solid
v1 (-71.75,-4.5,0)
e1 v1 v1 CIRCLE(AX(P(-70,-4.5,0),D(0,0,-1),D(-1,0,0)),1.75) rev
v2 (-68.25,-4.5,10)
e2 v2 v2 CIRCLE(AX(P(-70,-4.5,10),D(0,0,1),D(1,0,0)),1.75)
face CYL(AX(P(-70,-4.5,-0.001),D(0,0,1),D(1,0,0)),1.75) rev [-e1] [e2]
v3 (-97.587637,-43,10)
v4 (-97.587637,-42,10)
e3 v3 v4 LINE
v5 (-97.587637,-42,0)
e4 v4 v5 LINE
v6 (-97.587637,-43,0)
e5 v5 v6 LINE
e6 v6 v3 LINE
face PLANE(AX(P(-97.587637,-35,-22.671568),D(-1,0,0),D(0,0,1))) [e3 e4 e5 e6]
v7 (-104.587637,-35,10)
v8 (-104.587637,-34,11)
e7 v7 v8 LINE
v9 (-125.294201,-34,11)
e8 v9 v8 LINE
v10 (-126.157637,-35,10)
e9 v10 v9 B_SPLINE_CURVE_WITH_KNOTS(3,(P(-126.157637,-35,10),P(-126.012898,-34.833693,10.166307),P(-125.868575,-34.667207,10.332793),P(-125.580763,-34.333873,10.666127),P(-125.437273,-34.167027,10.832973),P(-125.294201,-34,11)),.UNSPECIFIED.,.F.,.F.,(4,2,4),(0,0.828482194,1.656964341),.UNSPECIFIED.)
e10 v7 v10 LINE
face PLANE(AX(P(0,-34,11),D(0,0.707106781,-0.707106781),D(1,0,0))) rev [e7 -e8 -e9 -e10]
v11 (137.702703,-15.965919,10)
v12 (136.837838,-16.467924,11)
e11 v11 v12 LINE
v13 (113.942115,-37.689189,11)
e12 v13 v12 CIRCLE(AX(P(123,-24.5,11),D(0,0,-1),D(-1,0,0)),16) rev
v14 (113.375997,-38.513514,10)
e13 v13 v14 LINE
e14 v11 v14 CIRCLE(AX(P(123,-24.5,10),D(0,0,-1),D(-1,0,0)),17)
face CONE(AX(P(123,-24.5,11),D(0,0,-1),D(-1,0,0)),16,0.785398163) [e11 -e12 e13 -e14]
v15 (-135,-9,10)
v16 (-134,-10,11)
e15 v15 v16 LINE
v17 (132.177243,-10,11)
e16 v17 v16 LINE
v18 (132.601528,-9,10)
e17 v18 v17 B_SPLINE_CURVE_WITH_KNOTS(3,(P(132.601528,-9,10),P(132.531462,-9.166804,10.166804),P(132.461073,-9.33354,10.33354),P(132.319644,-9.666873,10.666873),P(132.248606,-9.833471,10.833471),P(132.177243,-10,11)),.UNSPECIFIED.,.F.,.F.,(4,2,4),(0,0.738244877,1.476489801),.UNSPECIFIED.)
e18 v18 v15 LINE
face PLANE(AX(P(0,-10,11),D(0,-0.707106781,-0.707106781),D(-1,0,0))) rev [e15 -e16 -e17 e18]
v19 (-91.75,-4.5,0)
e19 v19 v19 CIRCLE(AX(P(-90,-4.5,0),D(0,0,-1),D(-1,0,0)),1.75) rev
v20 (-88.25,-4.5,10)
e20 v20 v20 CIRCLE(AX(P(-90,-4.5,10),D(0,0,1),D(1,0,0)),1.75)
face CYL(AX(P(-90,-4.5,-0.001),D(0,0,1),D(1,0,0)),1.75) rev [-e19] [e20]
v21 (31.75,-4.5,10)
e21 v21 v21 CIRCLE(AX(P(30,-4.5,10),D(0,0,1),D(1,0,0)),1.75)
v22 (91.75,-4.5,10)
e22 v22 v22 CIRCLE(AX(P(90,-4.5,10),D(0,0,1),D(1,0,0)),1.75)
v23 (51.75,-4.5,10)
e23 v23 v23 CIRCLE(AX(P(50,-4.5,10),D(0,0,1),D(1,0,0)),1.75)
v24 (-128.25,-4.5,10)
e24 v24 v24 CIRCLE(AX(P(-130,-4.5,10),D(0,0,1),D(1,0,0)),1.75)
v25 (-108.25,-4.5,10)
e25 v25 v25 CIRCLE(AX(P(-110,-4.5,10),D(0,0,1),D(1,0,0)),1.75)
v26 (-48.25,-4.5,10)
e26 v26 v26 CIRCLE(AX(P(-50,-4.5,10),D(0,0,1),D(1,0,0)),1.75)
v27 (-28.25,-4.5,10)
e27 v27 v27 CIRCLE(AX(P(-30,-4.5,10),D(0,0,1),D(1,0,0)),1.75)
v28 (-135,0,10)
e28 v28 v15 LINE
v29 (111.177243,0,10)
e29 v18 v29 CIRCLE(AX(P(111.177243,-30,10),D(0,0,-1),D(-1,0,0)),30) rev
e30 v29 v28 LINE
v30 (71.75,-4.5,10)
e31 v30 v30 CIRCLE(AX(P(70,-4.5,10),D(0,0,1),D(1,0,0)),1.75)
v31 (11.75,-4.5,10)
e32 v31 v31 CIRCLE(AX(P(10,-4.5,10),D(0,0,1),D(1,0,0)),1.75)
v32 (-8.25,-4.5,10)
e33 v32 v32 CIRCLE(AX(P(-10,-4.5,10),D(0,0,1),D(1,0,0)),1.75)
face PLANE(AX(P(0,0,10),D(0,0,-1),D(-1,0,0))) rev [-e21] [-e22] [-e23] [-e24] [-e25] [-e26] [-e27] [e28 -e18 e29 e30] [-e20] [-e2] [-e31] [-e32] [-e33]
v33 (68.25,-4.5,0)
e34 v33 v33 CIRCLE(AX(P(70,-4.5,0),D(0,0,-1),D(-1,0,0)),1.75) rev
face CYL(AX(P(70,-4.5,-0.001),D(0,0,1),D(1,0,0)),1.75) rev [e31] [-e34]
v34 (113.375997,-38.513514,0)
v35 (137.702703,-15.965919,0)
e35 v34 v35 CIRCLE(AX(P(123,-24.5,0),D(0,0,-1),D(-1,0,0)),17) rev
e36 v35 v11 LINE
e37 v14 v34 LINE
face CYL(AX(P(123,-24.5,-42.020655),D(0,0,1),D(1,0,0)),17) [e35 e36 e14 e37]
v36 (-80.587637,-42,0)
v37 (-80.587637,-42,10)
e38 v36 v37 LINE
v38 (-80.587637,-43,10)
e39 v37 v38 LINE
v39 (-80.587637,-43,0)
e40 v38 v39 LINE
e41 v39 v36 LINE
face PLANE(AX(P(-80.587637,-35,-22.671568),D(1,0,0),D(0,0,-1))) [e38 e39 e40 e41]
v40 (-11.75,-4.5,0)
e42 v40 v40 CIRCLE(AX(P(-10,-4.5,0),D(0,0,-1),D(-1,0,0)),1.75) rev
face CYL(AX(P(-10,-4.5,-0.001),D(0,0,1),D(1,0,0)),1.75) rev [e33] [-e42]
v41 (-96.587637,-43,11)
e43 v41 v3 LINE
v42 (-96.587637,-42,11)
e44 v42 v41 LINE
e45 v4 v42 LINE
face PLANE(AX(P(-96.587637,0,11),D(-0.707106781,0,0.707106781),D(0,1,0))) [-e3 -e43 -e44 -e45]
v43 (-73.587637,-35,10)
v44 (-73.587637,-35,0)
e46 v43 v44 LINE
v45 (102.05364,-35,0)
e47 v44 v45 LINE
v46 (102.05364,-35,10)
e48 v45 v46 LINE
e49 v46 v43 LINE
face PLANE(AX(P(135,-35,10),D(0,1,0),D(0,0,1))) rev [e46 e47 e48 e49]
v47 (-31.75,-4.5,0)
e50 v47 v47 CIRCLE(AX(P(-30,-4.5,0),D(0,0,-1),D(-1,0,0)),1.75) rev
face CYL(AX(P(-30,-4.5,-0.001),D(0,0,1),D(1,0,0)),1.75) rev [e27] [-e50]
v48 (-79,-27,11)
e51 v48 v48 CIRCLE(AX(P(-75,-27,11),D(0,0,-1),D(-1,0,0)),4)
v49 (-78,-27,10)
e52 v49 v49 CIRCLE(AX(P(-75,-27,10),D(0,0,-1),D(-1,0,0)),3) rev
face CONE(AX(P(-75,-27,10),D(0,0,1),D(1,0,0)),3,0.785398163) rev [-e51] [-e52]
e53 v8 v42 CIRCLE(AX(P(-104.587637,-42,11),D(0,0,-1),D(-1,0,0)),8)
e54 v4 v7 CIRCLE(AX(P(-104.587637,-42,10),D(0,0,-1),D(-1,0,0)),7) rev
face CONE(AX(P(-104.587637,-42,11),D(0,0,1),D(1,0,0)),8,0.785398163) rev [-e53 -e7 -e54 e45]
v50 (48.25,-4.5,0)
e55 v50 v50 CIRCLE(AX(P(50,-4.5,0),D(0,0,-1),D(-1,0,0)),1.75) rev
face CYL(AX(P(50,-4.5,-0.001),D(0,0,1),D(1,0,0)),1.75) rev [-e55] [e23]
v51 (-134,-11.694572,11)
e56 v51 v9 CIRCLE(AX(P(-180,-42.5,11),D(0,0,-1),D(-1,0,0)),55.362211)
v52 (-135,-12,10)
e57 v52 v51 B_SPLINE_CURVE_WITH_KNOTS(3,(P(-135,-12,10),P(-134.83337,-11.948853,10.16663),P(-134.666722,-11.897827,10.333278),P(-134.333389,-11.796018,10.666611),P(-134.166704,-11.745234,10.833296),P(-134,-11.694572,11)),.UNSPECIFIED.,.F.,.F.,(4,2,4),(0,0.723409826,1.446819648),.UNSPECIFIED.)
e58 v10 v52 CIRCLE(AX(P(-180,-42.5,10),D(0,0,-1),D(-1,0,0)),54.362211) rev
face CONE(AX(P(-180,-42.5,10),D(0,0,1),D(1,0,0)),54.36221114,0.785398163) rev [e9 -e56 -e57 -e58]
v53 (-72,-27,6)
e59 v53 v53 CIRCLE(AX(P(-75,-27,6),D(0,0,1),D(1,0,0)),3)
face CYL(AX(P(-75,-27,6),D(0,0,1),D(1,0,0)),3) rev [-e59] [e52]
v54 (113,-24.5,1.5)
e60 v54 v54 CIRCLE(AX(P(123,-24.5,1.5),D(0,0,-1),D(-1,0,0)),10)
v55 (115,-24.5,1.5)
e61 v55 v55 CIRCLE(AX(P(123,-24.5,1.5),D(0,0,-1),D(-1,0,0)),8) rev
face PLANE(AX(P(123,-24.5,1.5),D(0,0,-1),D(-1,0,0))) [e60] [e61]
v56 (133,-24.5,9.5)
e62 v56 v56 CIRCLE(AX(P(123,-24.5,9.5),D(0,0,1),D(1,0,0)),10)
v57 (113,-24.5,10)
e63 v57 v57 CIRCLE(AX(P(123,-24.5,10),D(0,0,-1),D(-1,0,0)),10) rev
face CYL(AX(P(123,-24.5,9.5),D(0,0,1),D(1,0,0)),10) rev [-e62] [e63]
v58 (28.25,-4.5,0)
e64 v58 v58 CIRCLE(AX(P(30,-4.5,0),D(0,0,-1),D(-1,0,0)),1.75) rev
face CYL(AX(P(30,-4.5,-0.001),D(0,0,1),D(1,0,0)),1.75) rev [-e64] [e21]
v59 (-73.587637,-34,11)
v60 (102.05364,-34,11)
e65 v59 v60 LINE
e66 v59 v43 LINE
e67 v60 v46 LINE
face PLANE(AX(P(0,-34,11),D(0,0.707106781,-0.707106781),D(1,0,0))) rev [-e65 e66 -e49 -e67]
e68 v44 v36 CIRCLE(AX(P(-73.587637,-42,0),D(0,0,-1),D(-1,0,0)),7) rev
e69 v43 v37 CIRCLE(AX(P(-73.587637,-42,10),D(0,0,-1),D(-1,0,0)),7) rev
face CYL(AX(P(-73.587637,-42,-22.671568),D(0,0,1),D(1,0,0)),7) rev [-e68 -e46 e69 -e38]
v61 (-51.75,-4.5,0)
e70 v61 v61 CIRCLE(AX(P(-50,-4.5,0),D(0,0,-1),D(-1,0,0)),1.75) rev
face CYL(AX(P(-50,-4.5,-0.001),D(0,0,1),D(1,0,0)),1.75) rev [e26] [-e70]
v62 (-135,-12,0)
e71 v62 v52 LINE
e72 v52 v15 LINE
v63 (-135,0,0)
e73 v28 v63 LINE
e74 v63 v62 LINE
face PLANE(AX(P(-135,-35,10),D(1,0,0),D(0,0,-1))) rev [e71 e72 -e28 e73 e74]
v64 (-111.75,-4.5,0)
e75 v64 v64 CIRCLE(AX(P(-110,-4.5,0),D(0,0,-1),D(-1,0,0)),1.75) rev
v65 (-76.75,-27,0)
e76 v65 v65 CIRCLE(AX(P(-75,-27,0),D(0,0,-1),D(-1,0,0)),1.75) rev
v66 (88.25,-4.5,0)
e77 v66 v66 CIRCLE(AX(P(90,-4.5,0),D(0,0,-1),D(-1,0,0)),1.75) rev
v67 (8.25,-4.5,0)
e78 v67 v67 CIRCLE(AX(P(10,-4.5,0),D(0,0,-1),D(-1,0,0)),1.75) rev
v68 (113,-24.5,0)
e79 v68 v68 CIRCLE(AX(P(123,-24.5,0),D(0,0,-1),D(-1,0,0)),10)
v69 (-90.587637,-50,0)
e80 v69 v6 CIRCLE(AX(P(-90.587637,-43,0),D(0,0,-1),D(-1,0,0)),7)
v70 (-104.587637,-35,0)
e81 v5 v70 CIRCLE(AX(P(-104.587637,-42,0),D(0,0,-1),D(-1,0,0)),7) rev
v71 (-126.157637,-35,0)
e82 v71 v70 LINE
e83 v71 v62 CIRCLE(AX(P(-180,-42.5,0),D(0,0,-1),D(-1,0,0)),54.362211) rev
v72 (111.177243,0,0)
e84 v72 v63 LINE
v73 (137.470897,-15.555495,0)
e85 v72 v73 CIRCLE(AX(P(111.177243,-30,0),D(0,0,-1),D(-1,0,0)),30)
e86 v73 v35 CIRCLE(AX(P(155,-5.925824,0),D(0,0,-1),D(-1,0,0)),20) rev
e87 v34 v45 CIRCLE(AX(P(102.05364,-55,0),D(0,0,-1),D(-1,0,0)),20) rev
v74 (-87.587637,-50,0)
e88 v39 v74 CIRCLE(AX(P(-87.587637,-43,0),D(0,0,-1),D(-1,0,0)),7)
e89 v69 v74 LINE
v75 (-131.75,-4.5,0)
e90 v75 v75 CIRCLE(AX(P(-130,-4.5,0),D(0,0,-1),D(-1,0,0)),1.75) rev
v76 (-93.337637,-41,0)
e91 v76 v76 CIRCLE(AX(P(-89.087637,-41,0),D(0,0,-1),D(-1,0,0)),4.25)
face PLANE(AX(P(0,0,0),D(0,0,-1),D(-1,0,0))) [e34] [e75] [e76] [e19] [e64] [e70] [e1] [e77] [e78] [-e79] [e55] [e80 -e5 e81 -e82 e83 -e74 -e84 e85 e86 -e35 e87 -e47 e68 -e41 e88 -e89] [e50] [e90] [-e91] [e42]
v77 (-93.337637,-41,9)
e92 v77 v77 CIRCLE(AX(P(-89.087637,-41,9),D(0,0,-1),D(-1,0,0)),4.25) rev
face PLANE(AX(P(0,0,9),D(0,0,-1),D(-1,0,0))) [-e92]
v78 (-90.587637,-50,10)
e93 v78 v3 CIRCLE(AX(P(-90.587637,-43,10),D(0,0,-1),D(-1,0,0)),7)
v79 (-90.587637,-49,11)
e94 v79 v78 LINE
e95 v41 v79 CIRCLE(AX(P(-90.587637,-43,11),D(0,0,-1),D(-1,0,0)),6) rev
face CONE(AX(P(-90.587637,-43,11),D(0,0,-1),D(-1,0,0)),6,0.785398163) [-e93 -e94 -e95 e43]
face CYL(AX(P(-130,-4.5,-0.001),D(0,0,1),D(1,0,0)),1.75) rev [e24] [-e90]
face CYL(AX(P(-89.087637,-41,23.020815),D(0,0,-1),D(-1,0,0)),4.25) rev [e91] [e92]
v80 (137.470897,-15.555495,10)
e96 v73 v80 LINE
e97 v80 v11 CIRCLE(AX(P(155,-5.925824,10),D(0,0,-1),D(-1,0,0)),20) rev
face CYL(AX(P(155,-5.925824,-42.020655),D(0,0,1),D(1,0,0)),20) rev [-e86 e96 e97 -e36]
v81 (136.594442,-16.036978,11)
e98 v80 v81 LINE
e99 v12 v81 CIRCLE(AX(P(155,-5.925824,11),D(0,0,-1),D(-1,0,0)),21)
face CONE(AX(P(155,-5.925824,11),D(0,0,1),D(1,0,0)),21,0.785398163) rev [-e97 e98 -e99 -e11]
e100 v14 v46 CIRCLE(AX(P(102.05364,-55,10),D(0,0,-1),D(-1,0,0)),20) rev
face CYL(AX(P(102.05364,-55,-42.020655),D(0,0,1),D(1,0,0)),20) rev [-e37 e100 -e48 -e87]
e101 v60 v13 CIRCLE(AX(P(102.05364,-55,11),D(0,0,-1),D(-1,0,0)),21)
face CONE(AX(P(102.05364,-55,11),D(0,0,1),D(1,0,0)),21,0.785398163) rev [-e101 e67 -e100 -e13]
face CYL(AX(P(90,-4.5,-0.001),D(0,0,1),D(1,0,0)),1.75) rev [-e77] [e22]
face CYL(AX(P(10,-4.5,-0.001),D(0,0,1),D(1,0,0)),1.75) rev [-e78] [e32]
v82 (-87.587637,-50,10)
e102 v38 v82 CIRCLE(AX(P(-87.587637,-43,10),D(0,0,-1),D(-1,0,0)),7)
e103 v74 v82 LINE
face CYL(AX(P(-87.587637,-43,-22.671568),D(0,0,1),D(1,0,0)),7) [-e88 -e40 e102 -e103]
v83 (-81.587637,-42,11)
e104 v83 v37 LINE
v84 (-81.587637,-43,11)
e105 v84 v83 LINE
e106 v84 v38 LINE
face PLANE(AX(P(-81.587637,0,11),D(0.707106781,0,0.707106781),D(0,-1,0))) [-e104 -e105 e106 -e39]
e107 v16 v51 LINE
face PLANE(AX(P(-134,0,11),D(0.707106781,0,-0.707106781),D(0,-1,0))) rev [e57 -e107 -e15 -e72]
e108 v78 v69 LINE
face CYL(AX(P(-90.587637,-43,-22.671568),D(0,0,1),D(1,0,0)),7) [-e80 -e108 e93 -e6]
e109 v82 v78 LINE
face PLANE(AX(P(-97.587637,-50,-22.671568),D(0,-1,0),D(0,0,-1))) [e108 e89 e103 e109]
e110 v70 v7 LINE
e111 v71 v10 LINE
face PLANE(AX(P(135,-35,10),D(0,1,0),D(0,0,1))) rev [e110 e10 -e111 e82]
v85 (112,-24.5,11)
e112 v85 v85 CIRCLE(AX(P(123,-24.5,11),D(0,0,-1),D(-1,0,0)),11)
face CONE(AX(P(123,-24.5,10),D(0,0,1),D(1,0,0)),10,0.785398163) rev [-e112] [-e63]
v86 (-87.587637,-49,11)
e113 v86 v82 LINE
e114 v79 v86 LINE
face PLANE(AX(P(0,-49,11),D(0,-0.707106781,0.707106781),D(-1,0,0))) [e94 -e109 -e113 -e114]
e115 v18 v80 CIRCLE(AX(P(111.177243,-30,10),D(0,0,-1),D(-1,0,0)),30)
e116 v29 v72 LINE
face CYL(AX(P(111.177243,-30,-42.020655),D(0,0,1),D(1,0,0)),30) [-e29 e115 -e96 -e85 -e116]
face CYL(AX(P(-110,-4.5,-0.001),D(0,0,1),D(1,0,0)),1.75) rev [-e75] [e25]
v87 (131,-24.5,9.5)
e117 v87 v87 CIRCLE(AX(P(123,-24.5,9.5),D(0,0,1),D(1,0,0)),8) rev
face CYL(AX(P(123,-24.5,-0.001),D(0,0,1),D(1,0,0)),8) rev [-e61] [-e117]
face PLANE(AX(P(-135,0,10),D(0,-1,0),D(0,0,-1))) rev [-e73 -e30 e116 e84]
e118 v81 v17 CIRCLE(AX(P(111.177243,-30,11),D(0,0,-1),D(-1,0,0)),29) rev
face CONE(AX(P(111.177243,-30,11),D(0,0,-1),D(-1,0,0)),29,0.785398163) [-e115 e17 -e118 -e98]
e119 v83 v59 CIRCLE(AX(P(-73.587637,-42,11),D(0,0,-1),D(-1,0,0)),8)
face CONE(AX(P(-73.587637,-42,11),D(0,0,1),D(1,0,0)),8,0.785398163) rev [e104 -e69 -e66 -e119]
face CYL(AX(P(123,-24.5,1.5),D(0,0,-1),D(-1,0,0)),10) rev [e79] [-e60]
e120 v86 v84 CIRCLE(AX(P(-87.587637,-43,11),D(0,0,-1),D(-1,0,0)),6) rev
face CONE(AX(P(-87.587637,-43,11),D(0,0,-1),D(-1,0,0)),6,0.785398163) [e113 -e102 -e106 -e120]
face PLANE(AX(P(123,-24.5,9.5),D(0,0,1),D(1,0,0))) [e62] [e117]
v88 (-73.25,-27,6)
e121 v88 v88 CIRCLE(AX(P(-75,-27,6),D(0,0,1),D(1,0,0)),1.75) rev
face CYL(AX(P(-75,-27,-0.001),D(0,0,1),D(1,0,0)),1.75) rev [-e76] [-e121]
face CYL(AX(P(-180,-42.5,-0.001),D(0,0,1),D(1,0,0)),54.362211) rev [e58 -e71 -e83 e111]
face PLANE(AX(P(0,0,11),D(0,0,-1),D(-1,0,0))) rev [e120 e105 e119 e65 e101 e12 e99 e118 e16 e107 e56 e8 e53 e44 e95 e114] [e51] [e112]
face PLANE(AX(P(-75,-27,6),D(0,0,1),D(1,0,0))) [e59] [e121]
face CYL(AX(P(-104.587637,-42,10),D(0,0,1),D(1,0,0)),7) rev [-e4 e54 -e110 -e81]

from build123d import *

# Parameters (mm, degrees)
SKETCH1_W           = 270
SKETCH1_H           = 35
BOSS_EXTRUDE1_DEPTH = 10
SKETCH2_W           = 270
SKETCH2_H           = 26
BOSS_EXTRUDE2_DEPTH = 1
CUT_EXTRUDE1_REACH  = 141.821
SKETCH3_R           = 1.75
CUT_EXTRUDE3_REACH  = 141.896
SKETCH4_R           = 8
SKETCH5_R           = 10
CUT_EXTRUDE4_DEPTH  = 1.5
CUT_EXTRUDE5_START  = -1.5
SKETCH6_R           = 10
CUT_EXTRUDE5_DEPTH  = 1.5
CUT_EXTRUDE14_REACH = 141.896
SKETCH20_W          = 17
SKETCH20_H          = 15
BOSS_EXTRUDE5_DEPTH = 11
SKETCH21_R          = 4.25
CUT_EXTRUDE15_DEPTH = 9
FILLET1_R           = 7
CUT_EXTRUDE16_REACH = 146.381
SKETCH22_R          = 1.75
SKETCH24_R          = 3
CUT_EXTRUDE17_DEPTH = 5
BOSS_EXTRUDE6_DEPTH = 11
FILLET2_R           = 20
FILLET3_R           = 30
CHAMFER1_SIZE       = 1


# Some blends are built 0.0001 mm under size
with BuildPart() as part:
    # Sketch1 → Boss-Extrude1 (new body)
    with BuildSketch(Plane.XY):
        with Locations((0, -17.5)):
            Rectangle(SKETCH1_W, SKETCH1_H)
    extrude(amount=BOSS_EXTRUDE1_DEPTH)

    # Sketch2 → Boss-Extrude2 (add)
    with BuildSketch(Plane.XY.offset(10)):
        with Locations((0, -22)):
            Rectangle(SKETCH2_W, SKETCH2_H)
    extrude(amount=BOSS_EXTRUDE2_DEPTH)

    # Sketch3 → Cut-Extrude1 (cut, up to next)
    with BuildSketch(Plane.XY.offset(10), mode=Mode.PRIVATE) as cut_extrude1_sk1:
        with Locations((-130, -4.5)):
            Circle(SKETCH3_R)
    cut_extrude1_tool1 = extrude(cut_extrude1_sk1.sketch, amount=-CUT_EXTRUDE1_REACH, mode=Mode.PRIVATE) & part.part
    # Sketch3 → Cut-Extrude1 (cut, up to next)
    with BuildSketch(Plane.XY.offset(10), mode=Mode.PRIVATE) as cut_extrude1_sk2:
        with Locations((-110, -4.5)):
            Circle(SKETCH3_R)
    cut_extrude1_tool2 = extrude(cut_extrude1_sk2.sketch, amount=-CUT_EXTRUDE1_REACH, mode=Mode.PRIVATE) & part.part
    # Sketch3 → Cut-Extrude1 (cut, up to next)
    with BuildSketch(Plane.XY.offset(10), mode=Mode.PRIVATE) as cut_extrude1_sk3:
        with Locations((-90, -4.5)):
            Circle(SKETCH3_R)
    cut_extrude1_tool3 = extrude(cut_extrude1_sk3.sketch, amount=-CUT_EXTRUDE1_REACH, mode=Mode.PRIVATE) & part.part
    # Sketch3 → Cut-Extrude1 (cut, up to next)
    with BuildSketch(Plane.XY.offset(10), mode=Mode.PRIVATE) as cut_extrude1_sk4:
        with Locations((-70, -4.5)):
            Circle(SKETCH3_R)
    cut_extrude1_tool4 = extrude(cut_extrude1_sk4.sketch, amount=-CUT_EXTRUDE1_REACH, mode=Mode.PRIVATE) & part.part
    # Sketch3 → Cut-Extrude1 (cut, up to next)
    with BuildSketch(Plane.XY.offset(10), mode=Mode.PRIVATE) as cut_extrude1_sk5:
        with Locations((-50, -4.5)):
            Circle(SKETCH3_R)
    cut_extrude1_tool5 = extrude(cut_extrude1_sk5.sketch, amount=-CUT_EXTRUDE1_REACH, mode=Mode.PRIVATE) & part.part
    # Sketch3 → Cut-Extrude1 (cut, up to next)
    with BuildSketch(Plane.XY.offset(10), mode=Mode.PRIVATE) as cut_extrude1_sk6:
        with Locations((-30, -4.5)):
            Circle(SKETCH3_R)
    cut_extrude1_tool6 = extrude(cut_extrude1_sk6.sketch, amount=-CUT_EXTRUDE1_REACH, mode=Mode.PRIVATE) & part.part
    # Sketch3 → Cut-Extrude1 (cut, up to next)
    with BuildSketch(Plane.XY.offset(10), mode=Mode.PRIVATE) as cut_extrude1_sk7:
        with Locations((-10, -4.5)):
            Circle(SKETCH3_R)
    cut_extrude1_tool7 = extrude(cut_extrude1_sk7.sketch, amount=-CUT_EXTRUDE1_REACH, mode=Mode.PRIVATE) & part.part
    # Sketch3 → Cut-Extrude1 (cut, up to next)
    with BuildSketch(Plane.XY.offset(10), mode=Mode.PRIVATE) as cut_extrude1_sk8:
        with Locations((10, -4.5)):
            Circle(SKETCH3_R)
    cut_extrude1_tool8 = extrude(cut_extrude1_sk8.sketch, amount=-CUT_EXTRUDE1_REACH, mode=Mode.PRIVATE) & part.part
    # Sketch3 → Cut-Extrude1 (cut, up to next)
    with BuildSketch(Plane.XY.offset(10), mode=Mode.PRIVATE) as cut_extrude1_sk9:
        with Locations((30, -4.5)):
            Circle(SKETCH3_R)
    cut_extrude1_tool9 = extrude(cut_extrude1_sk9.sketch, amount=-CUT_EXTRUDE1_REACH, mode=Mode.PRIVATE) & part.part
    # Sketch3 → Cut-Extrude1 (cut, up to next)
    with BuildSketch(Plane.XY.offset(10), mode=Mode.PRIVATE) as cut_extrude1_sk10:
        with Locations((50, -4.5)):
            Circle(SKETCH3_R)
    cut_extrude1_tool10 = extrude(cut_extrude1_sk10.sketch, amount=-CUT_EXTRUDE1_REACH, mode=Mode.PRIVATE) & part.part
    # Sketch3 → Cut-Extrude1 (cut, up to next)
    with BuildSketch(Plane.XY.offset(10), mode=Mode.PRIVATE) as cut_extrude1_sk11:
        with Locations((70, -4.5)):
            Circle(SKETCH3_R)
    cut_extrude1_tool11 = extrude(cut_extrude1_sk11.sketch, amount=-CUT_EXTRUDE1_REACH, mode=Mode.PRIVATE) & part.part
    # Sketch3 → Cut-Extrude1 (cut, up to next)
    with BuildSketch(Plane.XY.offset(10), mode=Mode.PRIVATE) as cut_extrude1_sk12:
        with Locations((90, -4.5)):
            Circle(SKETCH3_R)
    cut_extrude1_tool12 = extrude(cut_extrude1_sk12.sketch, amount=-CUT_EXTRUDE1_REACH, mode=Mode.PRIVATE) & part.part
    add(cut_extrude1_tool1.solids().sort_by_distance((-130, -4.5, 10))[0], mode=Mode.SUBTRACT)
    add(cut_extrude1_tool2.solids().sort_by_distance((-110, -4.5, 10))[0], mode=Mode.SUBTRACT)
    add(cut_extrude1_tool3.solids().sort_by_distance((-90, -4.5, 10))[0], mode=Mode.SUBTRACT)
    add(cut_extrude1_tool4.solids().sort_by_distance((-70, -4.5, 10))[0], mode=Mode.SUBTRACT)
    add(cut_extrude1_tool5.solids().sort_by_distance((-50, -4.5, 10))[0], mode=Mode.SUBTRACT)
    add(cut_extrude1_tool6.solids().sort_by_distance((-30, -4.5, 10))[0], mode=Mode.SUBTRACT)
    add(cut_extrude1_tool7.solids().sort_by_distance((-10, -4.5, 10))[0], mode=Mode.SUBTRACT)
    add(cut_extrude1_tool8.solids().sort_by_distance((10, -4.5, 10))[0], mode=Mode.SUBTRACT)
    add(cut_extrude1_tool9.solids().sort_by_distance((30, -4.5, 10))[0], mode=Mode.SUBTRACT)
    add(cut_extrude1_tool10.solids().sort_by_distance((50, -4.5, 10))[0], mode=Mode.SUBTRACT)
    add(cut_extrude1_tool11.solids().sort_by_distance((70, -4.5, 10))[0], mode=Mode.SUBTRACT)
    add(cut_extrude1_tool12.solids().sort_by_distance((90, -4.5, 10))[0], mode=Mode.SUBTRACT)

    # Sketch4 → Cut-Extrude3 (cut, up to next)
    with BuildSketch(Plane.XY.offset(11), mode=Mode.PRIVATE) as cut_extrude3_sk1:
        with Locations((123, -24.5)):
            Circle(SKETCH4_R)
    cut_extrude3_tool1 = extrude(cut_extrude3_sk1.sketch, amount=-CUT_EXTRUDE3_REACH, mode=Mode.PRIVATE) & part.part
    add(cut_extrude3_tool1.solids().sort_by_distance((123, -24.5, 11))[0], mode=Mode.SUBTRACT)

    # Sketch5 → Cut-Extrude4 (cut)
    with BuildSketch(Plane.XY.offset(11)):
        with Locations((123, -24.5)):
            Circle(SKETCH5_R)
    extrude(amount=-CUT_EXTRUDE4_DEPTH, mode=Mode.SUBTRACT)

    # Sketch6 → Cut-Extrude5 (cut)
    with BuildSketch(Plane(origin=(0, 0, 0), x_dir=(-1, 0, 0), z_dir=(0, 0, -1)).offset(CUT_EXTRUDE5_START)):
        with Locations(Location((-123, -24.5, 0), (0, 0, 180))):
            Circle(SKETCH6_R)
    extrude(amount=CUT_EXTRUDE5_DEPTH, mode=Mode.SUBTRACT)

    # Sketch19 → Cut-Extrude14 (cut, up to next)
    with BuildSketch(Plane.XY.offset(11), mode=Mode.PRIVATE) as cut_extrude14_sk1:
        with BuildLine():
            Line((-135, -12), (-135, -35))
            Line((-135, -35), (-126.157637496, -35))
            ThreePointArc((-126.157637496, -35), (-129.258467146, -22.992390109), (-135, -12))
        make_face()
    cut_extrude14_tool1 = extrude(cut_extrude14_sk1.sketch, amount=-CUT_EXTRUDE14_REACH, mode=Mode.PRIVATE) & part.part
    add(cut_extrude14_tool1.solids().sort_by_distance((-131.679264, -26.580863, 11))[0], mode=Mode.SUBTRACT)

    # Sketch20 → Boss-Extrude5 (add)
    with BuildSketch(Plane.XY.offset(11)):
        with Locations((-89.087637496, -42.5)):
            Rectangle(SKETCH20_W, SKETCH20_H)
    extrude(amount=-BOSS_EXTRUDE5_DEPTH)

    # Sketch21 → Cut-Extrude15 (cut)
    with BuildSketch(Plane(origin=(0, 0, 0), x_dir=(-1, 0, 0), z_dir=(0, 0, -1))):
        with Locations((89.087637496, -41)):
            Circle(SKETCH21_R)
    extrude(amount=-CUT_EXTRUDE15_DEPTH, mode=Mode.SUBTRACT)

    # Fillet1
    fillet1_edges = [part.edges().sort_by_distance(p)[0] for p in [
        (-80.587637496, -50, 5.5),
        (-80.587637496, -35, 5.5),
        (-97.587637496, -35, 5.5),
        (-97.587637496, -50, 5.5),
    ]]
    fillet(fillet1_edges, radius=FILLET1_R)

    # Sketch22 → Cut-Extrude16 (cut, up to next)
    with BuildSketch(Plane.XY.offset(11), mode=Mode.PRIVATE) as cut_extrude16_sk1:
        with Locations((-75, -27)):
            Circle(SKETCH22_R)
    cut_extrude16_tool1 = extrude(cut_extrude16_sk1.sketch, amount=-CUT_EXTRUDE16_REACH, mode=Mode.PRIVATE) & part.part
    add(cut_extrude16_tool1.solids().sort_by_distance((-75, -27, 11))[0], mode=Mode.SUBTRACT)

    # Sketch24 → Cut-Extrude17 (cut)
    with BuildSketch(Plane.XY.offset(11)):
        with Locations((-75, -27)):
            Circle(SKETCH24_R)
    extrude(amount=-CUT_EXTRUDE17_DEPTH, mode=Mode.SUBTRACT)

    # Sketch25 → Boss-Extrude6 (add)
    with BuildSketch(Plane.XY.offset(11)):
        with BuildLine():
            Line((109.630258043, -35), (135, -35))
            Line((135, -35), (135, -12.458405421))
            ThreePointArc((135, -12.458405421), (134.291586239, -37.208268183), (109.630258043, -35))
        make_face()
    extrude(amount=-BOSS_EXTRUDE6_DEPTH)

    # Fillet2
    fillet2_edges = [part.edges().sort_by_distance(p)[0] for p in [
        (109.630258043, -35, 5.5),
        (135, -12.458405421, 5.5),
    ]]
    fillet(fillet2_edges, radius=FILLET2_R)

    # Fillet3
    # the kernel refuses this fillet: 30 mm, written as the material it takes off along each edge
    with BuildSketch(Plane(origin=(135, 0, -59.556893558), x_dir=(0.15687721441573954, -0.9876181142512312, 0), z_dir=(0, 0, 1))) as fillet3_piece_1:
        with BuildLine():
            CenterArc((25.891295603, -28.234103195), FILLET3_R, 109.756652653, 61.217662553)
            Line((-3.737247824, -23.527786763), (-6.700102167, -23.057155119))
            Line((-6.700102167, -23.057155119), (-2.962854343, 0.470631643))
            Line((-2.962854343, 0.470631643), (0.470631643, 2.962854343))
            ThreePointArc((0.470631643, 2.962854343), (6.323083142, 2.033227521), (14.736437724, 2.823410319))
            Line((14.736437724, 2.823410319), (15.750515713, 0))
        make_face()
    extrude(amount=129.113787116, mode=Mode.SUBTRACT)

    # Chamfer1
    chamfer1_edges = [part.edges().sort_by_distance(p)[0] for p in [
        (-97.587637496, -42.5, 11),
        (-89.087637496, -50, 11),
        (-80.587637496, -42.5, 11),
        (14.233001219, -35, 11),
        (-82.637890028, -47.949747468, 11),
        (-95.537384964, -47.949747468, 11),
        (-99.637890028, -37.050252532, 11),
        (-78.537384964, -37.050252532, 11),
        (-78, -27, 11),
        (-135, -10.5, 11),
        (134.556244982, -36.96808734, 11),
        (107.981129718, -35.898563801, 11),
        (137.585590708, -15.761389895, 11),
        (-1.199236069, -9, 11),
        (135.260308634, -12.111290452, 11),
        (113, -24.5, 11),
        (-115.372637496, -35, 11),
        (-129.258467146, -22.992390109, 11),
    ]]
    chamfer(chamfer1_edges, length=CHAMFER1_SIZE - 0.0001)  # a hair under: the kernel refuses the full size


solid = part.part
